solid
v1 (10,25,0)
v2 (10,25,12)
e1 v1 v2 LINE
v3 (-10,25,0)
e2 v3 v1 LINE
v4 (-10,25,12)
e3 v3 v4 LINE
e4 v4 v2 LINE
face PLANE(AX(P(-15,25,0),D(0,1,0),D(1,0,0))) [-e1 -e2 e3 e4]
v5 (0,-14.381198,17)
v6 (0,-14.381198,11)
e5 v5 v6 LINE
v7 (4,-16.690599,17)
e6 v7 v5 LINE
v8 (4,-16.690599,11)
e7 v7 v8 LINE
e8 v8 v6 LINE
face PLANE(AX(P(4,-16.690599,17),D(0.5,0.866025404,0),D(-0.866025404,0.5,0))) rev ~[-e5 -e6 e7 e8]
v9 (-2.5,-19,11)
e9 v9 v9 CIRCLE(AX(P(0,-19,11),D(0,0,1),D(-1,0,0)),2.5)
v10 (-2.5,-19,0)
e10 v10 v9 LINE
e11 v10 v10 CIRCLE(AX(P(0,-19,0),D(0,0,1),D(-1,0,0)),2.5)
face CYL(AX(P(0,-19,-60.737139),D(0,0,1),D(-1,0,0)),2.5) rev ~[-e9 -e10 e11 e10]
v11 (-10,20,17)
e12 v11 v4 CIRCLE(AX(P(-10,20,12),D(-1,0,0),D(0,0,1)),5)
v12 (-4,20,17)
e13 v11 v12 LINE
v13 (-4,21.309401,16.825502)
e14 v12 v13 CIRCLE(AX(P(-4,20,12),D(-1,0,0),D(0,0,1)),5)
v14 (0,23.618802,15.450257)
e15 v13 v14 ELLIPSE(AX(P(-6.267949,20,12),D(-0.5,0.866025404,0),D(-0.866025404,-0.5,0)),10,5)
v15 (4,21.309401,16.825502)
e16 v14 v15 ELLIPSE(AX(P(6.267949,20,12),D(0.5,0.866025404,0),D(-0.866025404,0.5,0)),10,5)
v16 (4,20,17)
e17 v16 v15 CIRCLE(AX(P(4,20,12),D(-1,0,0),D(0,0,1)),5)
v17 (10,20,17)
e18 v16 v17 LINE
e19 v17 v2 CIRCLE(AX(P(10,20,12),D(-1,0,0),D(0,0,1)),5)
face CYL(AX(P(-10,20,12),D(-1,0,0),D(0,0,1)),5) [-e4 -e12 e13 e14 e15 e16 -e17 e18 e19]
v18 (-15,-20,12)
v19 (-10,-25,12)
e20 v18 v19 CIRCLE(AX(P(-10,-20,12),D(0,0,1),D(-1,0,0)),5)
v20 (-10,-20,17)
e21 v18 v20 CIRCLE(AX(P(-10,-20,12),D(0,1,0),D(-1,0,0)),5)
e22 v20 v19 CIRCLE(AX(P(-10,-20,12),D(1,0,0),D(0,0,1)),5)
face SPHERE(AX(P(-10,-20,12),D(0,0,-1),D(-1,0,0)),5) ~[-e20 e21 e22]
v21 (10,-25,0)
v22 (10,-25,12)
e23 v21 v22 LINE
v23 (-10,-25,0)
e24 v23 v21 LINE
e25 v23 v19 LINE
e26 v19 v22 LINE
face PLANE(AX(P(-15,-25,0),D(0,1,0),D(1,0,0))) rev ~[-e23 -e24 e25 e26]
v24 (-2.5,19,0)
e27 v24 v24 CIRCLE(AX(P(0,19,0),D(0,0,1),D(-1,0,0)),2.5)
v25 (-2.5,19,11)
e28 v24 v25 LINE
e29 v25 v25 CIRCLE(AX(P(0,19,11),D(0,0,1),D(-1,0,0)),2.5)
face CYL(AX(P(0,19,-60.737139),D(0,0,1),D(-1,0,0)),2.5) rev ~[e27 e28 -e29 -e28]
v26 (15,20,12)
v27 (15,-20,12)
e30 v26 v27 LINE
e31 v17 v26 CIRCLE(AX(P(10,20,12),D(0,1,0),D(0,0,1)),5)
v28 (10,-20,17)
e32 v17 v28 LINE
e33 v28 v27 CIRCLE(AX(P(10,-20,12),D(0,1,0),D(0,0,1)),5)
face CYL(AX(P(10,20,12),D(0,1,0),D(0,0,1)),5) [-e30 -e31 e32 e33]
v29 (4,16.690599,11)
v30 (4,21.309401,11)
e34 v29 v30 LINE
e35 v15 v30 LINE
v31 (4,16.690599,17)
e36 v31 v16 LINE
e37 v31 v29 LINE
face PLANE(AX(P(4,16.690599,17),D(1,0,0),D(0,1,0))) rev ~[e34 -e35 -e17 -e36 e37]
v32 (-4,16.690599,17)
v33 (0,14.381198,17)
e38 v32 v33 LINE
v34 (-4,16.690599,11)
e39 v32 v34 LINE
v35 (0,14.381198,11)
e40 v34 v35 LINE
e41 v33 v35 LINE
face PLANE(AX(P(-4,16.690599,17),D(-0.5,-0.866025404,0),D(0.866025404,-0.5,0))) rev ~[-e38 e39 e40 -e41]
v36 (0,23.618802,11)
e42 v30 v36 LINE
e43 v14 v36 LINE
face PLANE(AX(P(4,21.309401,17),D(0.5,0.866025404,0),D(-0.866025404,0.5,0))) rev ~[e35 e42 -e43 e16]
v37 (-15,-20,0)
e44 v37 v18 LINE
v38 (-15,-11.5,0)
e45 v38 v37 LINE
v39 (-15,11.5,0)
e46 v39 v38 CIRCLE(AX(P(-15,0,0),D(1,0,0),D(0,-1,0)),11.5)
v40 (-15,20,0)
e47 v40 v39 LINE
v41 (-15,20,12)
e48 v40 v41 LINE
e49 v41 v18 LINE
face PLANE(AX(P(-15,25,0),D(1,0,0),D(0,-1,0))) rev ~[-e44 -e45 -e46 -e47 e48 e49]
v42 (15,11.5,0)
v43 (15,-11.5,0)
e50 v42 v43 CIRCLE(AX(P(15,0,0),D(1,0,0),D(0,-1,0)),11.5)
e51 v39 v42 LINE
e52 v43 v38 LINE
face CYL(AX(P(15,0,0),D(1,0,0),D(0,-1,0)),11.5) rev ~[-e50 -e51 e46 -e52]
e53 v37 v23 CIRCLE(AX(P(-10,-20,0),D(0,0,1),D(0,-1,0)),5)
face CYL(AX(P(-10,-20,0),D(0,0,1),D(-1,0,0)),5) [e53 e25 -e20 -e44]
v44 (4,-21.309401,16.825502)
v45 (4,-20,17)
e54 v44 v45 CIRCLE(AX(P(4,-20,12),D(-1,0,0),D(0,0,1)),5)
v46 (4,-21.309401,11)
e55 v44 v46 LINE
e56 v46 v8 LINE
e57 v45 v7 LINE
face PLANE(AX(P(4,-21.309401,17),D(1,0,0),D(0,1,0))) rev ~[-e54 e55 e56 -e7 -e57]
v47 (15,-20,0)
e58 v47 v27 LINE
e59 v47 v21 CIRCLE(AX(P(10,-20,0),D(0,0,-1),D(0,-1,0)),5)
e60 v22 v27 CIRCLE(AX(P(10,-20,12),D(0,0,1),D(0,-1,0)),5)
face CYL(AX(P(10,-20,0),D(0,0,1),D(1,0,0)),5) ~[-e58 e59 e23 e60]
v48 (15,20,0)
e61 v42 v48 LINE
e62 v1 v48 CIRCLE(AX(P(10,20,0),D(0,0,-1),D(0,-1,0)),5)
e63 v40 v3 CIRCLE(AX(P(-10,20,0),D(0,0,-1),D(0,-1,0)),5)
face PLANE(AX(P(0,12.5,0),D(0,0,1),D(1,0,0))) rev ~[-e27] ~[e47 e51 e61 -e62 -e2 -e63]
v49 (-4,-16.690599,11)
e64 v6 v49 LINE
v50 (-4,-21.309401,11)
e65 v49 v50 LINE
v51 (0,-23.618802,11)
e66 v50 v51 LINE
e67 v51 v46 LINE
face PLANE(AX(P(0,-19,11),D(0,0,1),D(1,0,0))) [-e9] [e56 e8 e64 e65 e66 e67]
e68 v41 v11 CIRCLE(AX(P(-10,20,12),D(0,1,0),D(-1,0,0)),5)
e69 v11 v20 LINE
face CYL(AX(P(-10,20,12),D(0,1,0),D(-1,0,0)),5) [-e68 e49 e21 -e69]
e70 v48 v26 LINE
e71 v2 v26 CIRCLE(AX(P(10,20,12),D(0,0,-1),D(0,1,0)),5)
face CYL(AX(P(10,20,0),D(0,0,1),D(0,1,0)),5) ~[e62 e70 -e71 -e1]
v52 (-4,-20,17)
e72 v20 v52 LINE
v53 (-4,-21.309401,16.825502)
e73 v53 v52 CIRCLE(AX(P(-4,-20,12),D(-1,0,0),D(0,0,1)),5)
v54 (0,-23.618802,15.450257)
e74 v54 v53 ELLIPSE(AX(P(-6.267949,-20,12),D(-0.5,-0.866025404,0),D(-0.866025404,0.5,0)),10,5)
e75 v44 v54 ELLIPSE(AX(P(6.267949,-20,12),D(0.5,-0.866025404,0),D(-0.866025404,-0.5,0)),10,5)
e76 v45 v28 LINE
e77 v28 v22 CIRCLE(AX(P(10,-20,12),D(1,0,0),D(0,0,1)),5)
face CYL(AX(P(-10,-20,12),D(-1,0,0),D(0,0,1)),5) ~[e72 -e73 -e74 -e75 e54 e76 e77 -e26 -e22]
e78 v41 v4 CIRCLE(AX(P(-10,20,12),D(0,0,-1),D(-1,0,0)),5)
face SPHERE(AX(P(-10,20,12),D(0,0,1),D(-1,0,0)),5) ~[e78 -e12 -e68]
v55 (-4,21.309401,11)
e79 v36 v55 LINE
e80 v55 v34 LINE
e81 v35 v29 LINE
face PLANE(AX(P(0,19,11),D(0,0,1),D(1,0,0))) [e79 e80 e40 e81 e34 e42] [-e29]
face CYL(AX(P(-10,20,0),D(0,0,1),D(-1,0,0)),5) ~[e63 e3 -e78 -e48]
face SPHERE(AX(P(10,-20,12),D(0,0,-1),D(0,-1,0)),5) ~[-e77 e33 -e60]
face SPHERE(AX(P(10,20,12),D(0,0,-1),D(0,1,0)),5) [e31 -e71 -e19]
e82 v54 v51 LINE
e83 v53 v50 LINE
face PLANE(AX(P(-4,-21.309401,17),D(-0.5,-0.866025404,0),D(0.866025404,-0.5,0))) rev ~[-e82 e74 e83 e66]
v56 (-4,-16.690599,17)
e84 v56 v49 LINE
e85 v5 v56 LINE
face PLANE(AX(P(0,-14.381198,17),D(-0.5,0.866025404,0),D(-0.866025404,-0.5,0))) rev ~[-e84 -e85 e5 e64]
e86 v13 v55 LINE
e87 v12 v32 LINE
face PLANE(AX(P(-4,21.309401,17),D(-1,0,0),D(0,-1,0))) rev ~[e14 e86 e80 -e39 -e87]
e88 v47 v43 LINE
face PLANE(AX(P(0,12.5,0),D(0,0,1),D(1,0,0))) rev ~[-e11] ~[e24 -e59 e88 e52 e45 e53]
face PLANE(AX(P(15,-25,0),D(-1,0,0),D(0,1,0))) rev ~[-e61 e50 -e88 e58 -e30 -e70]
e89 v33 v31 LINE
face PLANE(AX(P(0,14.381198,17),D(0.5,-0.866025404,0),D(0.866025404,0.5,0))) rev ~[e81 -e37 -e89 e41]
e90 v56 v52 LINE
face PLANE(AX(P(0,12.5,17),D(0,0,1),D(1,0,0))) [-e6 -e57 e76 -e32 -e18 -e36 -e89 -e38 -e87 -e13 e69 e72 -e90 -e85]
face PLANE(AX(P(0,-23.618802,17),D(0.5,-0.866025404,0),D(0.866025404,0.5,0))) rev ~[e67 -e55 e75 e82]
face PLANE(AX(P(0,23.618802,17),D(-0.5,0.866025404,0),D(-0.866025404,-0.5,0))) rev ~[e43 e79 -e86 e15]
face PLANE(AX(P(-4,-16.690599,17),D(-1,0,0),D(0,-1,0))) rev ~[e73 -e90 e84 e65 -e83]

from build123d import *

# Parameters (mm, degrees)
F0_W         = 30
F0_H         = 25
F1_DEPTH     = 17
F3_DEPTH     = 50
F4_D         = 5
F5_R         = 2.5
F6_DEPTH     = 6
F7_R         = 5
F8_T1_DEPTH  = 40
F8_T3_DEPTH  = 20
F8_T6_ANGLE  = 90
F8_T8_ANGLE  = 90
F8_T10_ANGLE = 90
F8_T12_ANGLE = 90


# Not quite as in the source:
# - a fillet or chamfer that OpenCascade refuses, or shapes differently, is made with other operations: its cross-section is extruded or revolved along the edge and cut away or added


with BuildPart() as f1:
    # F0 (on Top) → F1 (new body)
    with BuildSketch(Plane.XY):
        with Locations((0, 12.5)):
            Rectangle(F0_W, F0_H)
        with Locations((0, -12.5)):
            Rectangle(F0_W, F0_H)
    extrude(amount=F1_DEPTH)

    # F2 (on face) → F3 (cut)
    with BuildSketch(Plane.YZ.offset(15)):
        with BuildLine():
            Line((-11.5, 0), (11.5, 0))
            ThreePointArc((11.5, 0), (0, 11.5), (-11.5, 0))
        make_face()
        with BuildLine():
            ThreePointArc((-11.5, 0), (0, -11.5), (11.5, 0))
            Line((11.5, 0), (-11.5, 0))
        make_face()
    extrude(amount=-F3_DEPTH, mode=Mode.SUBTRACT)

    # F4 (through all)
    with Locations(Plane(origin=(0, 0, 0), x_dir=(1, 0, 0), z_dir=(0, 0, -1))):
        with Locations((0, -19), (0, 19)):
            Hole(F4_D / 2)

    # F5 (on face) → F6 (cut)
    with BuildSketch(Plane.XY.offset(17)):
        Polygon((4, -21.3094010768), (4, -16.6905989232), (0, -14.3811978465), (-4, -16.6905989232), (-4, -21.3094010768), (0, -23.6188021535), align=None)
        with Locations((0, -19)):
            Circle(F5_R, mode=Mode.SUBTRACT)
        Polygon((4, 16.6905989232), (4, 21.3094010768), (0, 23.6188021535), (-4, 21.3094010768), (-4, 16.6905989232), (0, 14.3811978465), align=None)
        with Locations((0, 19)):
            Circle(F5_R, mode=Mode.SUBTRACT)
    extrude(amount=-F6_DEPTH, mode=Mode.SUBTRACT)

    # F7
    f7_edges = [f1.edges().sort_by_distance(p)[0] for p in [
        (-15, 25, 8.5),
        (15, 25, 8.5),
        (-15, -25, 8.5),
        (15, -25, 8.5),
    ]]
    fillet(f7_edges, radius=F7_R)

    # F8: fillet of radius 5 on 1 edges, made by hand

    # F8_s2 → F8_t1 (cut)
    with BuildSketch(Plane.XZ.offset(-20)):
        with BuildLine():
            ThreePointArc((-15, 12), (-13.5355339059, 15.5355339059), (-10, 17))
            Line((-10, 17), (-15, 17))
            Line((-15, 17), (-15, 12))
        make_face()
        with BuildLine():
            ThreePointArc((10, 17), (13.5355339059, 15.5355339059), (15, 12))
            Line((15, 12), (15, 17))
            Line((15, 17), (10, 17))
        make_face()
    extrude(amount=F8_T1_DEPTH, mode=Mode.SUBTRACT)

    # F8_s4 → F8_t3 (cut)
    with BuildSketch(Plane.YZ.offset(-10)):
        with BuildLine():
            ThreePointArc((-20, 17), (-23.5355339059, 15.5355339059), (-25, 12))
            Line((-25, 12), (-25, 17))
            Line((-25, 17), (-20, 17))
        make_face()
        with BuildLine():
            ThreePointArc((20, 17), (23.5355339059, 15.5355339059), (25, 12))
            Line((25, 12), (25, 17))
            Line((25, 17), (20, 17))
        make_face()
    extrude(amount=F8_T3_DEPTH, mode=Mode.SUBTRACT)

    # F8_s5 → F8_t6 (revolve, cut)
    with BuildSketch(Plane.XZ.offset(-20)):
        with BuildLine():
            ThreePointArc((-15, 12), (-13.5355339059, 15.5355339059), (-10, 17))
            Line((-10, 17), (-15, 17))
            Line((-15, 17), (-15, 12))
        make_face()
    revolve(axis=Axis((-10, 20, 17), (0, 0, -1)), revolution_arc=F8_T6_ANGLE, mode=Mode.SUBTRACT)

    # F8_s7 → F8_t8 (revolve, cut)
    with BuildSketch(Plane.XZ.offset(20)):
        with BuildLine():
            ThreePointArc((-10, 17), (-13.5355339059, 15.5355339059), (-15, 12))
            Line((-15, 12), (-15, 17))
            Line((-15, 17), (-10, 17))
        make_face()
    revolve(axis=Axis((-10, -20, 17), (0, 0, 1)), revolution_arc=F8_T8_ANGLE, mode=Mode.SUBTRACT)

    # F8_s9 → F8_t10 (revolve, cut)
    with BuildSketch(Plane.YZ.offset(10)):
        with BuildLine():
            ThreePointArc((-20, 17), (-23.5355339059, 15.5355339059), (-25, 12))
            Line((-25, 12), (-25, 17))
            Line((-25, 17), (-20, 17))
        make_face()
    revolve(axis=Axis((10, -20, 17), (0, 0, 1)), revolution_arc=F8_T10_ANGLE, mode=Mode.SUBTRACT)

    # F8_s11 → F8_t12 (revolve, cut)
    with BuildSketch(Plane.YZ.offset(10)):
        with BuildLine():
            ThreePointArc((20, 17), (23.5355339059, 15.5355339059), (25, 12))
            Line((25, 12), (25, 17))
            Line((25, 17), (20, 17))
        make_face()
    revolve(axis=Axis((10, 20, 17), (0, 0, -1)), revolution_arc=F8_T12_ANGLE, mode=Mode.SUBTRACT)


solid = f1.part
